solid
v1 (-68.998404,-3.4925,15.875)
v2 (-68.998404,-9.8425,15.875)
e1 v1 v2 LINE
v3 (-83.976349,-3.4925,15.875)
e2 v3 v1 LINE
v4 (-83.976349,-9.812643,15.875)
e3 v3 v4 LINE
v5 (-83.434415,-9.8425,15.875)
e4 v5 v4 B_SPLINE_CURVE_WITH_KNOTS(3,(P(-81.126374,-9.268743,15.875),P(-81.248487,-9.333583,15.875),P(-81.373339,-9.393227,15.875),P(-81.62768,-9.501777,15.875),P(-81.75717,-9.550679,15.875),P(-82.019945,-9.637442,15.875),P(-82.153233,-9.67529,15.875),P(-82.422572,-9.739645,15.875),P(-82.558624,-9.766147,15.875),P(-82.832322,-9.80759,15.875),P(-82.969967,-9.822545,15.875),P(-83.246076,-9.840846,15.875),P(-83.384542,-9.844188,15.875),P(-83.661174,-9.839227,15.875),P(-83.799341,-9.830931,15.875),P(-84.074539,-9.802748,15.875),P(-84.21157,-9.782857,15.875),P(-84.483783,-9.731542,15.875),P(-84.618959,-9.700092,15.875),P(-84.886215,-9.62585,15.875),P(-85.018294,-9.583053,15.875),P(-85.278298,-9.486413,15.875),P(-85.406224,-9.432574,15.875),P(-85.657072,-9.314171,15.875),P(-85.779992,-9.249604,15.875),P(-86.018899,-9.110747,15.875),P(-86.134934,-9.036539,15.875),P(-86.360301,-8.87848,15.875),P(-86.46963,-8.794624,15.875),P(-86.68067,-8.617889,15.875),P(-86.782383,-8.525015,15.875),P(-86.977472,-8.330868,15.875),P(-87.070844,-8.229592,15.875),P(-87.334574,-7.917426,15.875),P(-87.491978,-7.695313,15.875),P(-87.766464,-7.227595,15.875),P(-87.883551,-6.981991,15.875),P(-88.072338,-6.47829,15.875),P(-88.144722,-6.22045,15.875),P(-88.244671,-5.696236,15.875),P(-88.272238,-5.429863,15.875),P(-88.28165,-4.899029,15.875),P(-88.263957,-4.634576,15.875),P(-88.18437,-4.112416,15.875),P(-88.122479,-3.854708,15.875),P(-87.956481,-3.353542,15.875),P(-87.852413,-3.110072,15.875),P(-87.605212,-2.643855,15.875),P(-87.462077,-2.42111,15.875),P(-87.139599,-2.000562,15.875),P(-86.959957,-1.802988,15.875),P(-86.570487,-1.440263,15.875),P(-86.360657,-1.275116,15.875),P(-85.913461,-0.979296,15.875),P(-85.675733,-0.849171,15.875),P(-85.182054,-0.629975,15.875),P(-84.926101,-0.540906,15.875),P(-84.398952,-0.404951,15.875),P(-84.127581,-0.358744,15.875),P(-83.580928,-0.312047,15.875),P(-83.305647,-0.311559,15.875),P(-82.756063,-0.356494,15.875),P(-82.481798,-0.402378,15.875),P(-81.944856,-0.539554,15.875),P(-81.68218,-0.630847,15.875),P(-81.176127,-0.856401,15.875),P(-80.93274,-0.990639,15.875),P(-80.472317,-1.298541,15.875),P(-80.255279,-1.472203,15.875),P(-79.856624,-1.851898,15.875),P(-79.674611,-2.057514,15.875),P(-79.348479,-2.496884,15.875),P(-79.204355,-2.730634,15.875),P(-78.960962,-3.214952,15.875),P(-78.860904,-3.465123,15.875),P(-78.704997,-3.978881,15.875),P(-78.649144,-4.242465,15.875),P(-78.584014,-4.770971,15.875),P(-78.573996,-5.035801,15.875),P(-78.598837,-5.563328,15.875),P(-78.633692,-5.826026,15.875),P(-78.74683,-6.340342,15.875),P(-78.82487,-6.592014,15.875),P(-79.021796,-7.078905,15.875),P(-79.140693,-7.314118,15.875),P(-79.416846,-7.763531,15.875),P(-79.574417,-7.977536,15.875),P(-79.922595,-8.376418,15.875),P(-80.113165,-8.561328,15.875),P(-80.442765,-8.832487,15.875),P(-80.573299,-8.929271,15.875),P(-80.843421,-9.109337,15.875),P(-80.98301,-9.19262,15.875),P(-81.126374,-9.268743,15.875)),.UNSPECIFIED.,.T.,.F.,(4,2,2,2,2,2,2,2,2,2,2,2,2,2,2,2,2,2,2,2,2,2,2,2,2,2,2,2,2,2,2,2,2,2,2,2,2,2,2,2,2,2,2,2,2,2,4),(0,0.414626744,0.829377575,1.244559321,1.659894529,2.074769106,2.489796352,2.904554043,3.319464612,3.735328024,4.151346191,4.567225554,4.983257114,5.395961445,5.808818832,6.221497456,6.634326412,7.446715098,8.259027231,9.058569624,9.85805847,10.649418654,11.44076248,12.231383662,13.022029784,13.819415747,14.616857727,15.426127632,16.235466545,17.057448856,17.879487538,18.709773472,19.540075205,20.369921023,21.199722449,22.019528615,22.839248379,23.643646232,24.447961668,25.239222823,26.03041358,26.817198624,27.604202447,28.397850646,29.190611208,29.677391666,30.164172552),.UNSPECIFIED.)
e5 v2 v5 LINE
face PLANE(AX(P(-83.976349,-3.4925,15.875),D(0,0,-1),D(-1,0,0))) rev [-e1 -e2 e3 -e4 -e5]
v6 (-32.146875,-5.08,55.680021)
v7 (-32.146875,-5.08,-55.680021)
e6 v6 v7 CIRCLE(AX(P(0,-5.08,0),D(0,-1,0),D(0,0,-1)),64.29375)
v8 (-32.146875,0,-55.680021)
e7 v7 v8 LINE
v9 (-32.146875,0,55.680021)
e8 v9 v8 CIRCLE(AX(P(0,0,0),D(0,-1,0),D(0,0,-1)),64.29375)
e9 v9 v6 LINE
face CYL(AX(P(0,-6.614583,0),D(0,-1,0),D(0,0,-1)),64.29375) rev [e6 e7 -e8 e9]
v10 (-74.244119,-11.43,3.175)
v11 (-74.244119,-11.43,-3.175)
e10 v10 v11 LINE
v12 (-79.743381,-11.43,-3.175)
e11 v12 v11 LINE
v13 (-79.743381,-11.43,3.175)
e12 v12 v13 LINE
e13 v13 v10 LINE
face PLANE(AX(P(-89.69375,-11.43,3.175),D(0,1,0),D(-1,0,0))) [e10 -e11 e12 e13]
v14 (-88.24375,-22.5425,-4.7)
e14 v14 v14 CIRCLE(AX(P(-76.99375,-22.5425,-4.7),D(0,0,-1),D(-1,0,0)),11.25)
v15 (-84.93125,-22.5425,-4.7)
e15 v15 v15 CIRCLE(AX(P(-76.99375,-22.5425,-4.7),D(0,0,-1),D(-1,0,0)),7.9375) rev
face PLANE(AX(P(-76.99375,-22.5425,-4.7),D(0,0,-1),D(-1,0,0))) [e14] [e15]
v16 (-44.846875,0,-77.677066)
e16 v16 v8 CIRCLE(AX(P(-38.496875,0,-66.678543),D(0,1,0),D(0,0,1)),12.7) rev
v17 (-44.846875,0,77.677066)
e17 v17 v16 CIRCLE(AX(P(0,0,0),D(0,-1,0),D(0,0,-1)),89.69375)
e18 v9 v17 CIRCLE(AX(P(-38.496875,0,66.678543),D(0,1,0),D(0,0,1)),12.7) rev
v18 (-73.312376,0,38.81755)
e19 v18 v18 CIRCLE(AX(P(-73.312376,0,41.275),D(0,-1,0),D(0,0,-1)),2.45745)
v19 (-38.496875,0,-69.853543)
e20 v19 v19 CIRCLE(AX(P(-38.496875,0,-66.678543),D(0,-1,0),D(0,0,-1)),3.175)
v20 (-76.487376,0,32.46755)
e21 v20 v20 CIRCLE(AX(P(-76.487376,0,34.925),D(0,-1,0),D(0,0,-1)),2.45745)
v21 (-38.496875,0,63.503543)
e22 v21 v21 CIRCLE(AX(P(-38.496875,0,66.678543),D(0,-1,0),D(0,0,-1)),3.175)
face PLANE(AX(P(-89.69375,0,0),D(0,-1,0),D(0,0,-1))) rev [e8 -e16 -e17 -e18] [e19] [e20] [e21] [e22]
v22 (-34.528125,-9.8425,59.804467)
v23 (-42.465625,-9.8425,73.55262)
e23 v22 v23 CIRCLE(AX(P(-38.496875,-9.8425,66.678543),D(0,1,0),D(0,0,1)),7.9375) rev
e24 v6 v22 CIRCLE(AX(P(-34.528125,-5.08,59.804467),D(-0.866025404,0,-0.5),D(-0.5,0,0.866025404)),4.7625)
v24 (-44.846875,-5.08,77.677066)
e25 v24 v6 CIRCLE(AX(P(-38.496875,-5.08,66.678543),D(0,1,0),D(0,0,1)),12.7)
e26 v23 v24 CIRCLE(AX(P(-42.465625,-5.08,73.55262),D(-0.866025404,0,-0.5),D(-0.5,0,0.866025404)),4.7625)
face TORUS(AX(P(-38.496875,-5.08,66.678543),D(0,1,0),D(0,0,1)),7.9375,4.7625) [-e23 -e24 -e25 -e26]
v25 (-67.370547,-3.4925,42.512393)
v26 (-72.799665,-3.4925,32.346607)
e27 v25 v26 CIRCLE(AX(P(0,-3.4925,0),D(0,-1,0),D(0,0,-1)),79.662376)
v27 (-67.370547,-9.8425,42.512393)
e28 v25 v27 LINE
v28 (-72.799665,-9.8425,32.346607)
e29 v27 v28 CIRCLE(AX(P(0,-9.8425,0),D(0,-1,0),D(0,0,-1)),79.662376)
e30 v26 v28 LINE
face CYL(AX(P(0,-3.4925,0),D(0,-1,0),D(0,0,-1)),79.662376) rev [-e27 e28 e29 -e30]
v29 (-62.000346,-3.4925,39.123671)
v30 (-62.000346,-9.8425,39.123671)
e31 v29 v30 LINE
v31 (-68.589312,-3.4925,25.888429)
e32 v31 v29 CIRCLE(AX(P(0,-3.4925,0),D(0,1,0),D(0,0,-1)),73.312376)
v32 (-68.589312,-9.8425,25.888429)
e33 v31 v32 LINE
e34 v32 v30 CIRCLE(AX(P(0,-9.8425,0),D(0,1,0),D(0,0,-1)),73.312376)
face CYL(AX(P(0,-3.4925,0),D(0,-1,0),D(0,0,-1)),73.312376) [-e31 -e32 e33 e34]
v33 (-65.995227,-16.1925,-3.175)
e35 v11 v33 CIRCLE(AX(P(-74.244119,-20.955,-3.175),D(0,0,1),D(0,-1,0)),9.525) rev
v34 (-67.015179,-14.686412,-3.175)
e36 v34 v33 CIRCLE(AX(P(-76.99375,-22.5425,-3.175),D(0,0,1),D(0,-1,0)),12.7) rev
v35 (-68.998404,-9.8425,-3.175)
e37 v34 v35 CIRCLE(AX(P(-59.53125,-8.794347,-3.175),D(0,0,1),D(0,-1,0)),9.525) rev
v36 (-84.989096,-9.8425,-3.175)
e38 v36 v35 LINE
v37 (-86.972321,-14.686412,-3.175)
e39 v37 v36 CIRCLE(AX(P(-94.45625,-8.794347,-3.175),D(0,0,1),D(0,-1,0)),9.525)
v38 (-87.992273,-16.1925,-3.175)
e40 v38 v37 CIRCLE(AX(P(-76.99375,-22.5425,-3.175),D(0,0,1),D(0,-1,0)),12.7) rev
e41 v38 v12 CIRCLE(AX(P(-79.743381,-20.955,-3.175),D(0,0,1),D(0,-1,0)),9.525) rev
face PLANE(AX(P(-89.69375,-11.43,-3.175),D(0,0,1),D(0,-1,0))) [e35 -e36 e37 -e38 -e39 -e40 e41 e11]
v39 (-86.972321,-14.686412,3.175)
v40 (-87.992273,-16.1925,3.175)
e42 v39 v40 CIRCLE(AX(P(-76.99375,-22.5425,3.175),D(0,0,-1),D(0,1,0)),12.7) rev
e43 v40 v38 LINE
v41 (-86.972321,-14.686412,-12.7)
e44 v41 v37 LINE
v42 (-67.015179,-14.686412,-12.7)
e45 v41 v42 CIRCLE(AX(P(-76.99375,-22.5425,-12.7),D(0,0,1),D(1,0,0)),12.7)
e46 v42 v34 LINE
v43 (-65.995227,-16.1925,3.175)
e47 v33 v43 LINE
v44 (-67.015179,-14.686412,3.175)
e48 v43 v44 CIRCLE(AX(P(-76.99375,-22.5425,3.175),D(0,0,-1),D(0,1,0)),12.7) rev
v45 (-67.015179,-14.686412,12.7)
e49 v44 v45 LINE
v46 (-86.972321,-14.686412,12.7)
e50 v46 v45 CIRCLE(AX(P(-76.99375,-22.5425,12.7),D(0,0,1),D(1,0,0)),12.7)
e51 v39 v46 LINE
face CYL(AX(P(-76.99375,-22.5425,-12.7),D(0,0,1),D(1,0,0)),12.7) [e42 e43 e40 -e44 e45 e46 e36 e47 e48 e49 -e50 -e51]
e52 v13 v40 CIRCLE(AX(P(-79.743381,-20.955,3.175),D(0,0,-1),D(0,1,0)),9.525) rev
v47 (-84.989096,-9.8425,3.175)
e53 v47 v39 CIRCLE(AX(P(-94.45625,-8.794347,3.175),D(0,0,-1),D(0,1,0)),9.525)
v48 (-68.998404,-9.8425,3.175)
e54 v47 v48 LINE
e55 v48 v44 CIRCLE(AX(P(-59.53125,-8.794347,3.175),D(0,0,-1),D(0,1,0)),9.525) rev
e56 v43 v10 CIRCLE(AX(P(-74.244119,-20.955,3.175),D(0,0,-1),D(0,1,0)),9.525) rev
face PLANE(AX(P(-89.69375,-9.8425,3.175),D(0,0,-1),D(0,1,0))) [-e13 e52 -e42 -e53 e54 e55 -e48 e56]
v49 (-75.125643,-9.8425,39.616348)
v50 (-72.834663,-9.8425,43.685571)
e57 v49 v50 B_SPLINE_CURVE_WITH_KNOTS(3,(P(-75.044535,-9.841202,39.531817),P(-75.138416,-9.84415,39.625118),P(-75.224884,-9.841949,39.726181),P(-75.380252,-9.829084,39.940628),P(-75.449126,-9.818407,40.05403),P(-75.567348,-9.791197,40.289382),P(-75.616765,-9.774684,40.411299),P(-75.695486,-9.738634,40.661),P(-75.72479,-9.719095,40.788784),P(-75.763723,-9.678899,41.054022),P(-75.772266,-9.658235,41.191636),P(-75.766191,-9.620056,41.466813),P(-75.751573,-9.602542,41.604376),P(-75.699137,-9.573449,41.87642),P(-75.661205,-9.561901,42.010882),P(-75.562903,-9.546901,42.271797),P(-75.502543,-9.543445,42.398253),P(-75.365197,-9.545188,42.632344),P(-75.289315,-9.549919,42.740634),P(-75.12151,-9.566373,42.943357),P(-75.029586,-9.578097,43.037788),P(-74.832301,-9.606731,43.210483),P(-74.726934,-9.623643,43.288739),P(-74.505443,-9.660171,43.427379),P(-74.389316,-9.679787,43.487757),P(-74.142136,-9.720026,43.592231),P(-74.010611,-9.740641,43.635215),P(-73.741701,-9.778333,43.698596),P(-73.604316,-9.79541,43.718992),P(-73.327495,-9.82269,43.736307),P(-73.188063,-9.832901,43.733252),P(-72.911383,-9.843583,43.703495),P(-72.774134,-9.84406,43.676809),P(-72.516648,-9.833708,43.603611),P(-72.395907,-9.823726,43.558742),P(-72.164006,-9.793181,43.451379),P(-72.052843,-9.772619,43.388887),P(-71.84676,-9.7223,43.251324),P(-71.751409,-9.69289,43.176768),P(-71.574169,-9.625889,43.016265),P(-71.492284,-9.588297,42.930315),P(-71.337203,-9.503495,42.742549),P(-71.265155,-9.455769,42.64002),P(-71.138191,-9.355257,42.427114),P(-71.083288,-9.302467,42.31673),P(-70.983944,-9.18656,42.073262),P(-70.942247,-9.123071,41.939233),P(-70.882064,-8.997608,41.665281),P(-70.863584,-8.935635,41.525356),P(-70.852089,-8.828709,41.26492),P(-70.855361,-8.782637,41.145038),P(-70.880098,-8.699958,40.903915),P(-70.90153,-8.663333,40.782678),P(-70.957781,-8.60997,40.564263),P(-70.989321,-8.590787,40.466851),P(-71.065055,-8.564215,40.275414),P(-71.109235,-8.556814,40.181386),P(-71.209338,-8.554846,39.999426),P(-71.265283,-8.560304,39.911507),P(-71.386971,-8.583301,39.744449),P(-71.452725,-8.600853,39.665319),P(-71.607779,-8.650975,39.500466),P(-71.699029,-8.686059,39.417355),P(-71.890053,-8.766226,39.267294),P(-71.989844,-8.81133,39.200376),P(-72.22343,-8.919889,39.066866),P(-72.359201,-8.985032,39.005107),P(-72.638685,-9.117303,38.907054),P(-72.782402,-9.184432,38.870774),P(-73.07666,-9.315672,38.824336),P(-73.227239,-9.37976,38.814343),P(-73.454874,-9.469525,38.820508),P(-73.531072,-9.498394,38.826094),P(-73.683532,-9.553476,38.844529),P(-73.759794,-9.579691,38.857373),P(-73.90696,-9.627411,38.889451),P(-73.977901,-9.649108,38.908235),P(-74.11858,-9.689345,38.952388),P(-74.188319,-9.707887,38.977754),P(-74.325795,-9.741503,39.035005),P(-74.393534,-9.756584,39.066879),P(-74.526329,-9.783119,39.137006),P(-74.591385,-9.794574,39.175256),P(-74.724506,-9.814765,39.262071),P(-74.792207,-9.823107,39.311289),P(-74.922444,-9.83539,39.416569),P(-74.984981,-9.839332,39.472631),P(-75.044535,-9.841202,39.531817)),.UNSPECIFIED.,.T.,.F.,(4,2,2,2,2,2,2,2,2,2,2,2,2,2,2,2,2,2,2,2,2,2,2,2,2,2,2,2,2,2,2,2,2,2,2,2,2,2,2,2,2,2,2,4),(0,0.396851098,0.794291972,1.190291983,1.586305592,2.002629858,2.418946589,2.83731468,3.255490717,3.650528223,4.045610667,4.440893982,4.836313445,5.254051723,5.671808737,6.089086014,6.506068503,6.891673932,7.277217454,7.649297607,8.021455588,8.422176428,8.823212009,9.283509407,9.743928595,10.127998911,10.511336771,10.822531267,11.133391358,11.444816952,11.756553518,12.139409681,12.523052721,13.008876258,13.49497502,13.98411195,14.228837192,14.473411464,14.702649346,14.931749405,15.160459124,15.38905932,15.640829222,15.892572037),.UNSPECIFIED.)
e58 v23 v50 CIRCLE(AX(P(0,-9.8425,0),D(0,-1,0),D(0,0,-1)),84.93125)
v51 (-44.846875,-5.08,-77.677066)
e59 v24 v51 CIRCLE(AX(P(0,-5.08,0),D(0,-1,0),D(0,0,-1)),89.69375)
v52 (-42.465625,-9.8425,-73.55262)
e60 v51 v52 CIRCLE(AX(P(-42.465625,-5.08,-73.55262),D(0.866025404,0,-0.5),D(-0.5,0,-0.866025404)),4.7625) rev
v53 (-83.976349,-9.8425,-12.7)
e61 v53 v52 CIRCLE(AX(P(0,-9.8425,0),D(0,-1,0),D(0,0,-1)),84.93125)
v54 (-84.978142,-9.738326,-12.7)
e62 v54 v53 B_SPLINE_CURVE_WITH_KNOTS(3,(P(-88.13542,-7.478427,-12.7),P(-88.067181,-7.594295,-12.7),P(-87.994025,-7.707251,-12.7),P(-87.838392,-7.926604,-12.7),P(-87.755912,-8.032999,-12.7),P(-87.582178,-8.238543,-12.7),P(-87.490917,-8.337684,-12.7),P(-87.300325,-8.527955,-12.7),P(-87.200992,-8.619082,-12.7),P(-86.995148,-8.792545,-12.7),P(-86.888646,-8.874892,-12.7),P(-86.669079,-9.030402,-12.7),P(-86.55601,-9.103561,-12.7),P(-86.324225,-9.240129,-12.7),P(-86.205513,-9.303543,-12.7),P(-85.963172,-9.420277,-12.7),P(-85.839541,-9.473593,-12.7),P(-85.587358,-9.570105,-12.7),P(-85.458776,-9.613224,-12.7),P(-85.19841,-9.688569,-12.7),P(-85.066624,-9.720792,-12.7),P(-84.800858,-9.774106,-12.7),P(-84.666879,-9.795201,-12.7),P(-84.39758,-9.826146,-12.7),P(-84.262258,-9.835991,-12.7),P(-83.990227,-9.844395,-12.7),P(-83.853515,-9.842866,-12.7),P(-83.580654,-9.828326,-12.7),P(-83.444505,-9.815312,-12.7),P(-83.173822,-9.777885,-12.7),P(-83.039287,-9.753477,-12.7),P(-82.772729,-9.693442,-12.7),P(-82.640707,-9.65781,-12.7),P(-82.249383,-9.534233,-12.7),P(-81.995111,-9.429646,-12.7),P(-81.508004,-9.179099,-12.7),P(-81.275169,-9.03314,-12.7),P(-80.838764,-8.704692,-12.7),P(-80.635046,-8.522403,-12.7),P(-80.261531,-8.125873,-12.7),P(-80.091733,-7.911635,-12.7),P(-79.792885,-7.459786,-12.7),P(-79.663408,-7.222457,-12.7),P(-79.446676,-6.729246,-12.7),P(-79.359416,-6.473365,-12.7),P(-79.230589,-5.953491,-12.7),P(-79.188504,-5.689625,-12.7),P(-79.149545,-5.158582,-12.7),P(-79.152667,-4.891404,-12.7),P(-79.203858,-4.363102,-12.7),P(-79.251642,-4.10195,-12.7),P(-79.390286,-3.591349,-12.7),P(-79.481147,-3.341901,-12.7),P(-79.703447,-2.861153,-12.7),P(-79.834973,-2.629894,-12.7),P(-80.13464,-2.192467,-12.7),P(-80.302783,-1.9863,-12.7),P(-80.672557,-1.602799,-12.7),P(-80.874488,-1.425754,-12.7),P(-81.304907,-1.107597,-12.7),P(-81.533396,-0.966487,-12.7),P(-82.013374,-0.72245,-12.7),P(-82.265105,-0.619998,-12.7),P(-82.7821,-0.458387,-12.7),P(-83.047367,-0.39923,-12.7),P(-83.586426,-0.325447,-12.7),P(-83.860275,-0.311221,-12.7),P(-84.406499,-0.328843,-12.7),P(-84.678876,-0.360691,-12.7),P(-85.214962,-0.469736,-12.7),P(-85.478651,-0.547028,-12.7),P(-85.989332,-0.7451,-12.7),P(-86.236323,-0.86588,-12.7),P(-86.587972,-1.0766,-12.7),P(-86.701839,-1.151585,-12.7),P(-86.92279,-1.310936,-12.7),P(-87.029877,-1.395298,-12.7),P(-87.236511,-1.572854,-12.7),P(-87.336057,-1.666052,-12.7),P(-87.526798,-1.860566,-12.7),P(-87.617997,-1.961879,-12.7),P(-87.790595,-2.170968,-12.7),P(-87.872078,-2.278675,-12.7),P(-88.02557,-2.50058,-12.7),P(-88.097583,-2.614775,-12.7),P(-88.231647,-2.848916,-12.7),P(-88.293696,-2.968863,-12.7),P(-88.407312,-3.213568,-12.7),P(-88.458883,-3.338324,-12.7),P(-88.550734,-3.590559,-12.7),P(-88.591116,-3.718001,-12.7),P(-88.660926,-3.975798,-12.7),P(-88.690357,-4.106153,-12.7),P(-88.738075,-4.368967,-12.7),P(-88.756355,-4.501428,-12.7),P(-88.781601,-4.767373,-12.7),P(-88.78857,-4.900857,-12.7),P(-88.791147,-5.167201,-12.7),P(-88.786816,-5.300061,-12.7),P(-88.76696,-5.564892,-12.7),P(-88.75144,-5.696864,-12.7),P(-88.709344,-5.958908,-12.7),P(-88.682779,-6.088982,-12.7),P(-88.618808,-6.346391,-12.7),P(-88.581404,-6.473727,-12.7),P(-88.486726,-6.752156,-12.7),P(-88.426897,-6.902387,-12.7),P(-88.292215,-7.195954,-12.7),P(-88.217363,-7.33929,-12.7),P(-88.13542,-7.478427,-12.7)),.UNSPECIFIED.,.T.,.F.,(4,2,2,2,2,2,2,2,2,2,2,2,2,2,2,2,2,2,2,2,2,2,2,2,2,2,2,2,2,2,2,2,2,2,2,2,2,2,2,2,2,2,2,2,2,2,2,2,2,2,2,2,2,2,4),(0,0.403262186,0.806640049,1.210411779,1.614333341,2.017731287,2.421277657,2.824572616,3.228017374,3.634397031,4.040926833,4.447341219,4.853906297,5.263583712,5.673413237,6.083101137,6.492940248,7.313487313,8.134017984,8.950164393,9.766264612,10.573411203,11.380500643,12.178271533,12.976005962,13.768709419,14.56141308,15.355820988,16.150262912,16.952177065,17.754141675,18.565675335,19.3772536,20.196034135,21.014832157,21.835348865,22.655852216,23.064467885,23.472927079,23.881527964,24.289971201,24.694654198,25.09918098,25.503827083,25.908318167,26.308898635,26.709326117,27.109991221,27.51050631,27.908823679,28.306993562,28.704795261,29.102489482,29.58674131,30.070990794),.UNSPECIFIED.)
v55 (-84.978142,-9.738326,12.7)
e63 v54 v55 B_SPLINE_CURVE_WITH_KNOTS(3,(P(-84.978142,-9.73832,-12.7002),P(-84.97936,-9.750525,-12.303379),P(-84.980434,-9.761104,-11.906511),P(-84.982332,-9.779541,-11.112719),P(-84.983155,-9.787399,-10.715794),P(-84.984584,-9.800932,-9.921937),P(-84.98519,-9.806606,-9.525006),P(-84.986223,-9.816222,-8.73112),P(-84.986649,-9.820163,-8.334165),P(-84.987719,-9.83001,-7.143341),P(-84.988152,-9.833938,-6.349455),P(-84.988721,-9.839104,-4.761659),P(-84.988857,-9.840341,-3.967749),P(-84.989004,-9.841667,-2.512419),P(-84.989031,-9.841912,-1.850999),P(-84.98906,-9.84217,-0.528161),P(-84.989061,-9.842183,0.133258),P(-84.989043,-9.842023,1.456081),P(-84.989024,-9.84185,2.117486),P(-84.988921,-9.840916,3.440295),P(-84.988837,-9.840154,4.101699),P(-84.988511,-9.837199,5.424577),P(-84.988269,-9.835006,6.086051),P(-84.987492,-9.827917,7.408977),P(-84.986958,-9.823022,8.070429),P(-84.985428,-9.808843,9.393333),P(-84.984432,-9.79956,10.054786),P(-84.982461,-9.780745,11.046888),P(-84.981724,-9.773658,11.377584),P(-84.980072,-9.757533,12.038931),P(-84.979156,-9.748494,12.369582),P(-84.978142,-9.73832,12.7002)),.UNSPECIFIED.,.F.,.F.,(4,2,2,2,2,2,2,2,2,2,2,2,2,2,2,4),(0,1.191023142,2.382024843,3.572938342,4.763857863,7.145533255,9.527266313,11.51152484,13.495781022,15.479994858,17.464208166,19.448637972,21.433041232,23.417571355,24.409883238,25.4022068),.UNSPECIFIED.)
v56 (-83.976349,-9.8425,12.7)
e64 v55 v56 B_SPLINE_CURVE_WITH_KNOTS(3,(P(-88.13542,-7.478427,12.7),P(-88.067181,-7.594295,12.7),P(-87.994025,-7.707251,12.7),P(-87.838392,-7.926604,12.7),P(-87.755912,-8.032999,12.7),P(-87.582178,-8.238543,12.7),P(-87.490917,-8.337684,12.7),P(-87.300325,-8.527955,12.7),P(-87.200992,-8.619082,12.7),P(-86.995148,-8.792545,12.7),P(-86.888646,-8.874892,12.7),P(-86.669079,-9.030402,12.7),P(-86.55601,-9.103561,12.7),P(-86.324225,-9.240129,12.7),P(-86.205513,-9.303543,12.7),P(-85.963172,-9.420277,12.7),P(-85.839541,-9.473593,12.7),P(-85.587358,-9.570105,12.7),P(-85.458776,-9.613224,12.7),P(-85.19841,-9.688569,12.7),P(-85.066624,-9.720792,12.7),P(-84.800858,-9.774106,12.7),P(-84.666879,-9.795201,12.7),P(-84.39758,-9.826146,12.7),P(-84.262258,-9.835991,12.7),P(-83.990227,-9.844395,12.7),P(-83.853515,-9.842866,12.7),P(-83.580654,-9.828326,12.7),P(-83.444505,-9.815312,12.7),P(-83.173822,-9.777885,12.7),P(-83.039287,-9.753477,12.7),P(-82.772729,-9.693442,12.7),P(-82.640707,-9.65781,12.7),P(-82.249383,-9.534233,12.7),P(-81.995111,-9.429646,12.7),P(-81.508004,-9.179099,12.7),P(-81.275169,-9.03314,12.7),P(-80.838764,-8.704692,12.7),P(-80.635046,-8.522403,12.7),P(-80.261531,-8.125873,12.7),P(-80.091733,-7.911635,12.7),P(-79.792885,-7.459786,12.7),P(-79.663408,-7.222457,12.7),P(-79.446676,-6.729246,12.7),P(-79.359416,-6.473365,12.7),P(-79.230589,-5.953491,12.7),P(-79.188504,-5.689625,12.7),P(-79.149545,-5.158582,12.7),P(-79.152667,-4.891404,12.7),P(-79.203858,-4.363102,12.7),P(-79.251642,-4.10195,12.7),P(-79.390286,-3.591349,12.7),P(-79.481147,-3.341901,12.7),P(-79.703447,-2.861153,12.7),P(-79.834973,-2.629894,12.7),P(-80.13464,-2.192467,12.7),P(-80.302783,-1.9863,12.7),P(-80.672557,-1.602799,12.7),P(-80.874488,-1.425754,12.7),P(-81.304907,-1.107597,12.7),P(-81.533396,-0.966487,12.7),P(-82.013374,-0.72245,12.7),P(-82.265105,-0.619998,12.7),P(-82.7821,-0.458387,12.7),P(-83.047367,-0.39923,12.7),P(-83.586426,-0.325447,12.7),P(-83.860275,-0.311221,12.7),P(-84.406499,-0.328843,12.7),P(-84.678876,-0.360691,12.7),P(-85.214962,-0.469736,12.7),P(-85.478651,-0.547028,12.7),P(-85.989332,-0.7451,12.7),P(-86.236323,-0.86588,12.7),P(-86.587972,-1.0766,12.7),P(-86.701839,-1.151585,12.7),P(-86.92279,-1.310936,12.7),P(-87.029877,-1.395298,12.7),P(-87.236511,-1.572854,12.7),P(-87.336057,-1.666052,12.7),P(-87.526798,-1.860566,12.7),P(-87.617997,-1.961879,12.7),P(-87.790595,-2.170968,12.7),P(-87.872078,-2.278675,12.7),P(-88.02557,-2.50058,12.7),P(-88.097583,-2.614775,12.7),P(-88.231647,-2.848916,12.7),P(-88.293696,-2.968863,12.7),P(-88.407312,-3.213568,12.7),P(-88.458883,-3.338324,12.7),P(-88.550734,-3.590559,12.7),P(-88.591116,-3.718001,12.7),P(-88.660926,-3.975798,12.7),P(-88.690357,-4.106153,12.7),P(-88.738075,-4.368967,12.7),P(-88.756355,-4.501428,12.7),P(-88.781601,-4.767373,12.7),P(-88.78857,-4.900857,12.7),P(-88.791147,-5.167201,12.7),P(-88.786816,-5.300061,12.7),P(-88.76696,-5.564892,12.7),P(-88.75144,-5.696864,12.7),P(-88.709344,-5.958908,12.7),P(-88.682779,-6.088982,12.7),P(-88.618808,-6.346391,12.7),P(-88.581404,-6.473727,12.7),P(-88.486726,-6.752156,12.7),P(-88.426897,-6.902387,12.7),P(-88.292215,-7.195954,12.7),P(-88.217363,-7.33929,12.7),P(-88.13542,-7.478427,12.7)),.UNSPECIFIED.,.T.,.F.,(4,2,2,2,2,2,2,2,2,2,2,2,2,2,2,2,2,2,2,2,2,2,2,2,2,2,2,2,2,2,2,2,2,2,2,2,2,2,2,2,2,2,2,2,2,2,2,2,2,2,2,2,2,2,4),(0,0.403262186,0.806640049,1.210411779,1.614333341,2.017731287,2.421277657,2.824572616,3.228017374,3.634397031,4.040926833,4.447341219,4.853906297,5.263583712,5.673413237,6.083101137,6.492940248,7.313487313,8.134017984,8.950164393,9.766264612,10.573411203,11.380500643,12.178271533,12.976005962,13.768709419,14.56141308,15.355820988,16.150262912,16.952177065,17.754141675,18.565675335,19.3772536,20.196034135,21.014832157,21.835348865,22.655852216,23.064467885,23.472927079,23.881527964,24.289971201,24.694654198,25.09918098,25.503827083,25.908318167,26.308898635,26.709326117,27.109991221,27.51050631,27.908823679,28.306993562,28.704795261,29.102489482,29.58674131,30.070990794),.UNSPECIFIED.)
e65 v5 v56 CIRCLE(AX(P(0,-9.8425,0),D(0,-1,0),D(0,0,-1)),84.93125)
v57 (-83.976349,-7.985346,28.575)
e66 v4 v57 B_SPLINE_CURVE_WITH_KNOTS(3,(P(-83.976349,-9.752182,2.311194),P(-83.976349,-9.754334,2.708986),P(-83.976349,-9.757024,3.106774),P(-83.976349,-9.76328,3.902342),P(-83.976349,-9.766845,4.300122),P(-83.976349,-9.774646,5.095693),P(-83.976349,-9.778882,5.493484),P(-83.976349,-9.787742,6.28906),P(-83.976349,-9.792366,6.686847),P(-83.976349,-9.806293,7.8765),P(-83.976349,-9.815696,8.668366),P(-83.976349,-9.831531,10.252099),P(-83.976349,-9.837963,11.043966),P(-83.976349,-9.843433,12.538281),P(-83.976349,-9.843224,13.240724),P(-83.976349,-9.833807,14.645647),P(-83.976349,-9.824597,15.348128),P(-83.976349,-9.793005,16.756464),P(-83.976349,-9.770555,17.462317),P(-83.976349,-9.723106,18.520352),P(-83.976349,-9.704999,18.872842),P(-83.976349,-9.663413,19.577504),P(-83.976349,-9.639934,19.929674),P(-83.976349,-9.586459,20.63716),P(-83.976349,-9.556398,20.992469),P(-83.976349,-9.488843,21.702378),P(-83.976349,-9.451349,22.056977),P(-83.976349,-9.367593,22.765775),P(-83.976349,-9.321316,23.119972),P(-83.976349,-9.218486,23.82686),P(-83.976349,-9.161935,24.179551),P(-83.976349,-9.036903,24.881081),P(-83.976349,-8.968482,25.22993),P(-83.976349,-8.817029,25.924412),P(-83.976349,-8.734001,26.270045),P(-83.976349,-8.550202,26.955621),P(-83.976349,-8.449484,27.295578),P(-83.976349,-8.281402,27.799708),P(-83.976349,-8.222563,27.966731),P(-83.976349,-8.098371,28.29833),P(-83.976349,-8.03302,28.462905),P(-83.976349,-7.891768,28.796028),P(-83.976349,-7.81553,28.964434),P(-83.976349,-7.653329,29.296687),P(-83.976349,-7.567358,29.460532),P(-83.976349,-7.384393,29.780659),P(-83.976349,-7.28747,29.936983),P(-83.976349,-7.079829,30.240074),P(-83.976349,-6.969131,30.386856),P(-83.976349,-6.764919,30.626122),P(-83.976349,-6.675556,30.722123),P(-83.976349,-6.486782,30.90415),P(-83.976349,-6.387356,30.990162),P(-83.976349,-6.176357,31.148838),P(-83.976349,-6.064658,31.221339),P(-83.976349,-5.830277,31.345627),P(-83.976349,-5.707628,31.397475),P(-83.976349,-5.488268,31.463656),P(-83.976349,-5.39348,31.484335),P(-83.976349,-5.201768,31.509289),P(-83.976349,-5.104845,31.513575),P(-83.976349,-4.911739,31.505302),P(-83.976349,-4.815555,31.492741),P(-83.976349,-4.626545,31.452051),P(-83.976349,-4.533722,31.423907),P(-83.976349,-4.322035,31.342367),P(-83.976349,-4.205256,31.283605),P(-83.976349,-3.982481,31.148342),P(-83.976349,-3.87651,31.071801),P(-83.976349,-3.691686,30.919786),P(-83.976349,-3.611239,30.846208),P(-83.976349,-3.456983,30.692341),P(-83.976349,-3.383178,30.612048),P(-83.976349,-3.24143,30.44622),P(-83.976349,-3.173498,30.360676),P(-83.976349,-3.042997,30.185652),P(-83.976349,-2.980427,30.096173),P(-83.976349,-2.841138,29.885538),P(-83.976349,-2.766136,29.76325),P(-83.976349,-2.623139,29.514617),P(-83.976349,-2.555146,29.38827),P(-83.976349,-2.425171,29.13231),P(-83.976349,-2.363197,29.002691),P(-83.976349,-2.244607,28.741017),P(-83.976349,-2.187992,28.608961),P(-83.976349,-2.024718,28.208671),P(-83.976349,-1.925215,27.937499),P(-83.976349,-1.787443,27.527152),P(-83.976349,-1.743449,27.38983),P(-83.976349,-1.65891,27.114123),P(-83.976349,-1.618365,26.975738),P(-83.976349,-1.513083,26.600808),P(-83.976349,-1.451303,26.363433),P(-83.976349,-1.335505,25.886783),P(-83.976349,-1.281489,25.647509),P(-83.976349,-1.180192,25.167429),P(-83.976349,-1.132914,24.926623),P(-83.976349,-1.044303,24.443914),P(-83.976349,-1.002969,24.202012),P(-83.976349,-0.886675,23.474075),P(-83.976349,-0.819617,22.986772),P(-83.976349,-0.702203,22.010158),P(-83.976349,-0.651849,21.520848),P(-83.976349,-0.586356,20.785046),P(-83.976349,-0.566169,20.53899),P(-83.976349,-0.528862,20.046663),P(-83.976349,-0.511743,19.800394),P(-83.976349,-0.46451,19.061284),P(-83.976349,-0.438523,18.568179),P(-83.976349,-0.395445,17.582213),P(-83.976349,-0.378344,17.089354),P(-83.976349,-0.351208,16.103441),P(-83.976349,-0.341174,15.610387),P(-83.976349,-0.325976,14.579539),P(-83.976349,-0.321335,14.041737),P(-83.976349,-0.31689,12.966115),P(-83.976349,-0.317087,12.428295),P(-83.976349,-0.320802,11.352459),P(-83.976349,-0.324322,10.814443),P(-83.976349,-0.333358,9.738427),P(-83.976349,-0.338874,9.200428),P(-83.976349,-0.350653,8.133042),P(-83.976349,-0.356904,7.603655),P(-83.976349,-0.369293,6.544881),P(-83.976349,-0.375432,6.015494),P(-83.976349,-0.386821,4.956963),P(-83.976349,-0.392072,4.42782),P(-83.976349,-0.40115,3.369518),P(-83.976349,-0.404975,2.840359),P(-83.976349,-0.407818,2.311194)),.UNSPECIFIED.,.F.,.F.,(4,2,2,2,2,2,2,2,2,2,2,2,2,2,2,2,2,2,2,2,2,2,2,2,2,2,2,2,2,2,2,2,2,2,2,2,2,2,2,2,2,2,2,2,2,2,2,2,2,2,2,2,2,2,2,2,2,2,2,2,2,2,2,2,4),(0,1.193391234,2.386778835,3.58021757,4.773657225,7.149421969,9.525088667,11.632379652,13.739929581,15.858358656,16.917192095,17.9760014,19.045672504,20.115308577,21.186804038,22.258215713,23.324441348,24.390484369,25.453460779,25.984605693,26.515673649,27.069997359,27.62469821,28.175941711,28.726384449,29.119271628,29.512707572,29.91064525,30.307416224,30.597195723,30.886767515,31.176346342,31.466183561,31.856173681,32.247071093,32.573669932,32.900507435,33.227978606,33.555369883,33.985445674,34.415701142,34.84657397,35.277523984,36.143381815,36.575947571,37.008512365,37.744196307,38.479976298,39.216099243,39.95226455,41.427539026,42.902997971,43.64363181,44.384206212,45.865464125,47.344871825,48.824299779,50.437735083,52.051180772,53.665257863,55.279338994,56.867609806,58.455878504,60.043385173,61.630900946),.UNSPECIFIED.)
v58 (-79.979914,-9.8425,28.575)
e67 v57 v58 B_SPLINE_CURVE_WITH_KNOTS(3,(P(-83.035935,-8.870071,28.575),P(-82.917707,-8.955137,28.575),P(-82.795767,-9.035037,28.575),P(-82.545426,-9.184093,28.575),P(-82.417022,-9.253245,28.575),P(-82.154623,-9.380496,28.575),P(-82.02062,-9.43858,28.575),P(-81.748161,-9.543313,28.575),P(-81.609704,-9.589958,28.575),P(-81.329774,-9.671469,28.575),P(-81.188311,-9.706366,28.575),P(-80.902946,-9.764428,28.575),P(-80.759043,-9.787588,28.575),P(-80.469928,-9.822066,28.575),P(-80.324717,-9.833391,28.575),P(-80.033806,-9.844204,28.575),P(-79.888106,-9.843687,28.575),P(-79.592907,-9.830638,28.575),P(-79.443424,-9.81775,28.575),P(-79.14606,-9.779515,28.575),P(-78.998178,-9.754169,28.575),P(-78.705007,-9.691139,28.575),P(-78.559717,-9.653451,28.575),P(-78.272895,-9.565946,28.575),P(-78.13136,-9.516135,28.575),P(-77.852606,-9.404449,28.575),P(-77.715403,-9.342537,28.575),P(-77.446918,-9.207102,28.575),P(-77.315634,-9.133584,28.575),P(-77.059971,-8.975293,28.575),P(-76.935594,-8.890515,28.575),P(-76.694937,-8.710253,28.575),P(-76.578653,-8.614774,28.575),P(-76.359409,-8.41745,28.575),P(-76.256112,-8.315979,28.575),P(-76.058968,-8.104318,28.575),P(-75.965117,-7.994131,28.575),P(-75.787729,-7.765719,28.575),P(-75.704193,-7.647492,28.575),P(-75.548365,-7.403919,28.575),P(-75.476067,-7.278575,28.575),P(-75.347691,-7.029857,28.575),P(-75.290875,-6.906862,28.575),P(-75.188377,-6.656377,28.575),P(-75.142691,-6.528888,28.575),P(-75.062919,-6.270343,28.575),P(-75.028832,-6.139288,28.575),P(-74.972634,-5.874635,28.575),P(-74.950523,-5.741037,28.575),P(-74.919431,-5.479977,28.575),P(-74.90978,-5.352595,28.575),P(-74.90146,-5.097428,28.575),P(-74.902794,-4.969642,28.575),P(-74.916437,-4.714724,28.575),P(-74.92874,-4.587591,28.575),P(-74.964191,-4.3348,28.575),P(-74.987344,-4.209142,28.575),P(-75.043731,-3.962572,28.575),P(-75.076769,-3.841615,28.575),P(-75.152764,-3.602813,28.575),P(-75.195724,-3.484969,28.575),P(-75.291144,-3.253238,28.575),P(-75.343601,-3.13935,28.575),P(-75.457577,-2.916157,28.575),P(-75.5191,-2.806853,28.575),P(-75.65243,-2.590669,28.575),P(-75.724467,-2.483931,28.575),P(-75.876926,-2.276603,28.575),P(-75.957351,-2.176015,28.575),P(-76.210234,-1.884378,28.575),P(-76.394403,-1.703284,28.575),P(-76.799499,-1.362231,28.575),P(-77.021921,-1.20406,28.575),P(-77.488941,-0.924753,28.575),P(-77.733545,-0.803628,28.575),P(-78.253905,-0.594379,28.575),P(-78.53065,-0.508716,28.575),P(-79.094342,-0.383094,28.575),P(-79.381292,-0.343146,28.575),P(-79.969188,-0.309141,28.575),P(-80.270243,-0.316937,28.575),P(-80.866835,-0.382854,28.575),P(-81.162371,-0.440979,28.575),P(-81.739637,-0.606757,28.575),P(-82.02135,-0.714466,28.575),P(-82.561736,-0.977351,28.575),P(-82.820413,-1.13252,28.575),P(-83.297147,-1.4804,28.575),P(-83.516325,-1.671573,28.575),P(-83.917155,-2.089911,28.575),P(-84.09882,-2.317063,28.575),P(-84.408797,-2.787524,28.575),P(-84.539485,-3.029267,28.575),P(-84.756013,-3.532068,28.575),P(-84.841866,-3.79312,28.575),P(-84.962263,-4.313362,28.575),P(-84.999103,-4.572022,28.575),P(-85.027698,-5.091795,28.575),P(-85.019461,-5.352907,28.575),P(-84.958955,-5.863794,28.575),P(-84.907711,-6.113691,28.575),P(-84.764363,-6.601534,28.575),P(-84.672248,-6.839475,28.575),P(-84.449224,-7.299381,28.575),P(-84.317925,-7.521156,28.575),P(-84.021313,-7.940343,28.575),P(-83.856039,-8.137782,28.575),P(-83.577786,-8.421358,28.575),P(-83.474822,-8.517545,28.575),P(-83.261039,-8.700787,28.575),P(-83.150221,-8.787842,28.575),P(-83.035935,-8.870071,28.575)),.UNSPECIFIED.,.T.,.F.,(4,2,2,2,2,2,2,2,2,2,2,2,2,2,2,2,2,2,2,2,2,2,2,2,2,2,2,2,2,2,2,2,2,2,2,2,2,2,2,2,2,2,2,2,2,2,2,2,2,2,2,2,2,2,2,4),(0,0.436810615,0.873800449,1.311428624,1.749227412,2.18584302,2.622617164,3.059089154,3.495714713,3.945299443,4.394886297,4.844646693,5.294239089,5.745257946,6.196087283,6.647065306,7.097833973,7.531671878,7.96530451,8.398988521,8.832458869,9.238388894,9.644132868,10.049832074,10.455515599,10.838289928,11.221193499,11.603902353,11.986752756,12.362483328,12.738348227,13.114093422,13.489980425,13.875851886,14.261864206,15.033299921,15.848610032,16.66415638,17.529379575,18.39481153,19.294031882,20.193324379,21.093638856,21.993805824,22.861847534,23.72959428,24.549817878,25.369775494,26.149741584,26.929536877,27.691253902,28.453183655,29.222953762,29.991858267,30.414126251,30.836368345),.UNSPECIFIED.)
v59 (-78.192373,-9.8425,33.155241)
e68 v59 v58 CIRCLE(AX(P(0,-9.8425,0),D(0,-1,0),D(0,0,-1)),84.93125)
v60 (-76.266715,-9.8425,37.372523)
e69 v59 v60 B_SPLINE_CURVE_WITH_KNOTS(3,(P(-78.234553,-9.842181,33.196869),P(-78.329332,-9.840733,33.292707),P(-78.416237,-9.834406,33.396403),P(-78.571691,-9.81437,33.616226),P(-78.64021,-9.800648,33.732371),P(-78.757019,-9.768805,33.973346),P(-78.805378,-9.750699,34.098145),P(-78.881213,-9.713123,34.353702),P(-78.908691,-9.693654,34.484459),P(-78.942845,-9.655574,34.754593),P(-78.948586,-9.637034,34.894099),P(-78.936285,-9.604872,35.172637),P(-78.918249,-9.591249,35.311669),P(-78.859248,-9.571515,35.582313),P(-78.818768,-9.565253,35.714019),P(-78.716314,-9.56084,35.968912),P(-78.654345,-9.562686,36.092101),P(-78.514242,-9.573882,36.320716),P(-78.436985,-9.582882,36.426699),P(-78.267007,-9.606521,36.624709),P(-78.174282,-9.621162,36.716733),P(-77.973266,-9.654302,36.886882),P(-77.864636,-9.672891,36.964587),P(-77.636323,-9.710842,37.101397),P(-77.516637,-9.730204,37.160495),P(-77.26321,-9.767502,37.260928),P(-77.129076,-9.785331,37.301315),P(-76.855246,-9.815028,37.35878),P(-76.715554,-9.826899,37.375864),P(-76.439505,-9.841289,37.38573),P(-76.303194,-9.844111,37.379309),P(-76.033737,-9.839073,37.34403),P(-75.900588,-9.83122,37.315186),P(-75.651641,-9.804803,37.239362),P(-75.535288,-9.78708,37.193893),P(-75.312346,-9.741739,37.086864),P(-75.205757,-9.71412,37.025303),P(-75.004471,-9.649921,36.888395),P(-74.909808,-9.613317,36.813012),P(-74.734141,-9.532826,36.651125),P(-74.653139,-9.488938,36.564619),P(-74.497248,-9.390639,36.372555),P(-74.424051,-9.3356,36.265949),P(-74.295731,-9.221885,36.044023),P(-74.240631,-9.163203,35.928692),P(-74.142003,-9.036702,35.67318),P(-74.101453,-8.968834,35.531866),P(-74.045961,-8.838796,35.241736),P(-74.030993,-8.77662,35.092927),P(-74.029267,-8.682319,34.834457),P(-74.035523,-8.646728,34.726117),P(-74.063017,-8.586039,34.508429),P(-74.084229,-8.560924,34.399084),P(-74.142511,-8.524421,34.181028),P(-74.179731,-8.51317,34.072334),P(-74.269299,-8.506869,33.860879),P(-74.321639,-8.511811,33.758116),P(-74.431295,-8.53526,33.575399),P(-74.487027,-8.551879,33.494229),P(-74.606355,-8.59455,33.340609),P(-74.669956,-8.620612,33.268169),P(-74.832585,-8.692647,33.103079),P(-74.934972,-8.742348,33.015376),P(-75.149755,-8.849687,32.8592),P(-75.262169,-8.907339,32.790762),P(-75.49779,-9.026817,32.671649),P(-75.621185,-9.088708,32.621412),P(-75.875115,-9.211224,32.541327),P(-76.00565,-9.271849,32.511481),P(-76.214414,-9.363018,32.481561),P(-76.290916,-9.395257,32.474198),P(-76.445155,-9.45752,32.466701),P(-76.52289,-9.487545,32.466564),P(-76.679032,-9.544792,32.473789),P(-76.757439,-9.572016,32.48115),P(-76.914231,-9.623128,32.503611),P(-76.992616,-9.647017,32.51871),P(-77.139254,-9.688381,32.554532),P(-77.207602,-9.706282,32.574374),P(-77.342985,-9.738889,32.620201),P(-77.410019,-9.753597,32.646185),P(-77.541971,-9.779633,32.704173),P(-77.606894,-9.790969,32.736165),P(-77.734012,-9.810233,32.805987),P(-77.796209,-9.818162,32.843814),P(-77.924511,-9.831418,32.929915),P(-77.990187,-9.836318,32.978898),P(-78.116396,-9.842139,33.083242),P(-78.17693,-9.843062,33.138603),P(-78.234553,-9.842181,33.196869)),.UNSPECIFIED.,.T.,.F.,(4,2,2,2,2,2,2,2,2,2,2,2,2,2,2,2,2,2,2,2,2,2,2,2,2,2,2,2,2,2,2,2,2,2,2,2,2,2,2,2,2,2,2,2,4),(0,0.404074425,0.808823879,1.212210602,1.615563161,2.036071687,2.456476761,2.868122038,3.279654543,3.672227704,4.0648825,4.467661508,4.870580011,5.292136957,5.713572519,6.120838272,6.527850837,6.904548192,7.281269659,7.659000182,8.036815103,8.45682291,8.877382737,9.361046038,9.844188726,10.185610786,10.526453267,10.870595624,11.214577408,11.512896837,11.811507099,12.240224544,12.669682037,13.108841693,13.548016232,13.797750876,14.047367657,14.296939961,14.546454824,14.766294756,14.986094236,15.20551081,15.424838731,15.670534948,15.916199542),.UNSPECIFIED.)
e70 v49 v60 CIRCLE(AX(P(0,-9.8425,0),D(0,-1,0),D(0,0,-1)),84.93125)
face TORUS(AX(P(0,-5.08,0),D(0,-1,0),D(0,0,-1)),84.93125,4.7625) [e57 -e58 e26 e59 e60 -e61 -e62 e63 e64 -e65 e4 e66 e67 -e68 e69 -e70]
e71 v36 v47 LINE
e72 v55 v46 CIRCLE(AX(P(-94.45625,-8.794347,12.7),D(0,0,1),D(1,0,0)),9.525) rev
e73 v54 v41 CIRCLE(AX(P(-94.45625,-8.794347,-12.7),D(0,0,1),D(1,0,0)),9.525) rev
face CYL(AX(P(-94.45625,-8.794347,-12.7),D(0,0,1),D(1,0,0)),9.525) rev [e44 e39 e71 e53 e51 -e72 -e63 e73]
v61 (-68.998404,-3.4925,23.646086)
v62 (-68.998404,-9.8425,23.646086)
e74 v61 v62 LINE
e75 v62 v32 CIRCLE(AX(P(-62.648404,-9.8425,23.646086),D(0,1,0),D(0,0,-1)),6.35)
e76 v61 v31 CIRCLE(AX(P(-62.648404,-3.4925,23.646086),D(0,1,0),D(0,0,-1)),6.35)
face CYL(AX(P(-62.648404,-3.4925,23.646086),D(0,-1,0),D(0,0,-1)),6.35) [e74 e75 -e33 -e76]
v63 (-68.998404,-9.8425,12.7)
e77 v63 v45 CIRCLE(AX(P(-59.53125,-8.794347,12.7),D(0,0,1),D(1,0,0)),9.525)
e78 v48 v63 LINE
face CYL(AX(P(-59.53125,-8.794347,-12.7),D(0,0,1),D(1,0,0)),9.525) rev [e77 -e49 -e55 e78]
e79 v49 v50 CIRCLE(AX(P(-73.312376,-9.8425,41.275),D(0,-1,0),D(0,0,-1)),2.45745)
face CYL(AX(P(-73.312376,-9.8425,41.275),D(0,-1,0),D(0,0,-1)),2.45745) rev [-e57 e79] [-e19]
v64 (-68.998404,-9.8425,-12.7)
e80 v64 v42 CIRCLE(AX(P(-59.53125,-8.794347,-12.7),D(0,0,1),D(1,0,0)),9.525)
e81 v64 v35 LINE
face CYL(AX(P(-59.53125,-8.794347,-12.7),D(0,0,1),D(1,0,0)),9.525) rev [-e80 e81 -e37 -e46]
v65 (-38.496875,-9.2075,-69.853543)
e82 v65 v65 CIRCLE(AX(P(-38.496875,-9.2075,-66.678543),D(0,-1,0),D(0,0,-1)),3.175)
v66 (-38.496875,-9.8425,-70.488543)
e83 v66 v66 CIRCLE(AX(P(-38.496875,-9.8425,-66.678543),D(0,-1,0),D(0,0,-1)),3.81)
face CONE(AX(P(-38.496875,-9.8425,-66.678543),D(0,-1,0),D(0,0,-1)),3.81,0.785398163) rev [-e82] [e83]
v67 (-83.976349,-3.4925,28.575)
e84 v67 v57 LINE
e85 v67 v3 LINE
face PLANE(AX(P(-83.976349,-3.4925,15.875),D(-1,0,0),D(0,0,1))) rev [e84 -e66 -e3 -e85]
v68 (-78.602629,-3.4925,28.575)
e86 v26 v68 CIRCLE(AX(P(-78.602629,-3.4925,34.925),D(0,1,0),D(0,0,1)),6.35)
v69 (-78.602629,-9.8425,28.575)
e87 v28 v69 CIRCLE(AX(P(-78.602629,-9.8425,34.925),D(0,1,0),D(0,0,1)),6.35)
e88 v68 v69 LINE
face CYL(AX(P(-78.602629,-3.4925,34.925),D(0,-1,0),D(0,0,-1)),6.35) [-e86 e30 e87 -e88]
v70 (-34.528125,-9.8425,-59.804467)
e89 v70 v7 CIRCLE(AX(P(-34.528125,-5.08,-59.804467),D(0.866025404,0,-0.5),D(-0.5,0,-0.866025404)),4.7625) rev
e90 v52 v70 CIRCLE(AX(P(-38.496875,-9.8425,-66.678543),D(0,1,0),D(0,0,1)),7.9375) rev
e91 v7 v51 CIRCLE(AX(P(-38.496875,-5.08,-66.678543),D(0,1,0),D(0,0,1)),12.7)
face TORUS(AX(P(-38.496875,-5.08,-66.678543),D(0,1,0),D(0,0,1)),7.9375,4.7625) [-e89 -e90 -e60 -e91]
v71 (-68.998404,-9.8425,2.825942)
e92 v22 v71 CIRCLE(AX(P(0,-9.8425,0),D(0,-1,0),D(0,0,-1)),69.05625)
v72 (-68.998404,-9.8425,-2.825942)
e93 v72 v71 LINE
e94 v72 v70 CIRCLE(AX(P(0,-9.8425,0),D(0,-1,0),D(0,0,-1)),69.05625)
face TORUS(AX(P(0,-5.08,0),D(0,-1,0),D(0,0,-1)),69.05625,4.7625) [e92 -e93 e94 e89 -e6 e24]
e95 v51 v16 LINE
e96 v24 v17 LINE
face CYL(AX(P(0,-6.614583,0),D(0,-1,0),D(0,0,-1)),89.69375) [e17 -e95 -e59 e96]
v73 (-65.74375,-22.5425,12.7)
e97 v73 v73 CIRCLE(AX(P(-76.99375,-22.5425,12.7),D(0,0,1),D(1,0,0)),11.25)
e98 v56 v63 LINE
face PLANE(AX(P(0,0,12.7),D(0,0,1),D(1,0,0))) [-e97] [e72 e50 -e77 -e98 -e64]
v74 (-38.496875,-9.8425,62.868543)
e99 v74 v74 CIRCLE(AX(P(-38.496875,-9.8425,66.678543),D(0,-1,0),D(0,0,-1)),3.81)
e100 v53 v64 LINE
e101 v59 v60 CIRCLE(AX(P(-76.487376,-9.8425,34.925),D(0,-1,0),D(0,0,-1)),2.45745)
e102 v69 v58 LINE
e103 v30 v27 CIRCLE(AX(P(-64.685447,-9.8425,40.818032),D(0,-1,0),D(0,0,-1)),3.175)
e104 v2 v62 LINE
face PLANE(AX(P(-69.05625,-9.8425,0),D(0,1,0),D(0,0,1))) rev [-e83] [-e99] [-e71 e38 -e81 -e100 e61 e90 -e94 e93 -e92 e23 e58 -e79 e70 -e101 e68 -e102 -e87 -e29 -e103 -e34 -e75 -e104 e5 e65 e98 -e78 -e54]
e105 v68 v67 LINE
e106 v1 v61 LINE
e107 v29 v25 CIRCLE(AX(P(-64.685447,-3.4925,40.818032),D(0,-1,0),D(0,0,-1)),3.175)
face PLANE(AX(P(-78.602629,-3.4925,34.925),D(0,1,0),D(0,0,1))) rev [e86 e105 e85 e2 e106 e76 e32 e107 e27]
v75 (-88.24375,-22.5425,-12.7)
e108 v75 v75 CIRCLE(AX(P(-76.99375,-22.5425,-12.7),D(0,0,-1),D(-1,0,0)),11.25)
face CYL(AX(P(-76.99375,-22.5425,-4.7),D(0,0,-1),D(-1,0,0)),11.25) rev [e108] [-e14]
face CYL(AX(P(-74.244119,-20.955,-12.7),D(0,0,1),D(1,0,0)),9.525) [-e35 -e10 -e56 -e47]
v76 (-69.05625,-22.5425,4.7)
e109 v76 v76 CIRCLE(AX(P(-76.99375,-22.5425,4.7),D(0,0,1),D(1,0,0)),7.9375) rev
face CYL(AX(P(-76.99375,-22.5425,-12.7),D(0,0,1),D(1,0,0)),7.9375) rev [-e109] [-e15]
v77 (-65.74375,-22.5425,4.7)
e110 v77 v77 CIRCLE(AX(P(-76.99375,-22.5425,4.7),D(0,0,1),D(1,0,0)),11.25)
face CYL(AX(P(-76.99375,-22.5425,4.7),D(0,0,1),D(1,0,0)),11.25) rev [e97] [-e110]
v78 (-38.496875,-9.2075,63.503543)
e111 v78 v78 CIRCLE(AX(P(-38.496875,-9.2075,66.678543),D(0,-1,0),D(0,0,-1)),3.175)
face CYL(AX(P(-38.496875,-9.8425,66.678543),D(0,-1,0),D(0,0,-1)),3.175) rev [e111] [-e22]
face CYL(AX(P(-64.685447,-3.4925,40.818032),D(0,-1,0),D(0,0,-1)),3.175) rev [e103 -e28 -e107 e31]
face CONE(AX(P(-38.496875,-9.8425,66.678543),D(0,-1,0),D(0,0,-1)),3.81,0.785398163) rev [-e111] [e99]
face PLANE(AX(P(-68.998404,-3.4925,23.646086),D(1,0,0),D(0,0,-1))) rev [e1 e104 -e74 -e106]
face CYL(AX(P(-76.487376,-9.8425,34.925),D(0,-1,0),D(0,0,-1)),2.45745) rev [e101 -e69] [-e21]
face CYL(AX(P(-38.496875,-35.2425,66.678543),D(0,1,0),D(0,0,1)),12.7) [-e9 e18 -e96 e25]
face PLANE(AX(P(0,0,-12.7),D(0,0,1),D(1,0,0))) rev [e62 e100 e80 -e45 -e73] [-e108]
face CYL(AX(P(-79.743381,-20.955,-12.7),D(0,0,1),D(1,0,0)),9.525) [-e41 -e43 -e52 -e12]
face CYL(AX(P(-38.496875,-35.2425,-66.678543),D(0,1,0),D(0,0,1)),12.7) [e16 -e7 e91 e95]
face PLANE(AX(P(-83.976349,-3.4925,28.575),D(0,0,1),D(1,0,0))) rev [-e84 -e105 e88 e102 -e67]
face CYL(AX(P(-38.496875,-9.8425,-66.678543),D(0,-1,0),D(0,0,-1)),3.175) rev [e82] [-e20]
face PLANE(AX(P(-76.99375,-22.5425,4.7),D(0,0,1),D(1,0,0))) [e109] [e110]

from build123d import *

# Parameters (mm, degrees)
SENSORARMATURE_DEPTH                  = 12.7
SENSORARMATURE_DEPTH_BACK             = 12.7
SKETCH2_R                             = 7.9375
SKETCH2_R_2                           = 4
SKETCH2_R_3                           = 2.38125
SKETCH15_R                            = 11.25
BEARINGRACE1_DEPTH                    = 8
SKETCH16_R                            = 11.25
BEARINGRACE2_DEPTH                    = 8
CUT_EXTRUDE3_DEPTH                    = 188.895496905
FILLET1_R                             = 9.525
MAINSENSORINSET_DEPTH                 = 6.35
F_10_0_1935_DIAMETER_HOLE1_D          = 4.9149
F_1_4_0_25_DIAMETER_HOLE1_D           = 6.35
F_1_4_0_25_DIAMETER_HOLE1_CSINK_D     = 7.62
F_1_4_0_25_DIAMETER_HOLE1_CSINK_ANGLE = 90
CUT_EXTRUDE6_DEPTH                    = 132.65094541
CUT_EXTRUDE6_DEPTH_BACK               = 132.65094541
FILLET2_ANGLE                         = 180
FILLET2_2_ANGLE                       = 180


with BuildPart() as part:
    # Sketch1 → MainAttachmentRing (revolve)
    with BuildSketch(Plane.XY, mode=Mode.PRIVATE) as mainattachmentring_sk:
        with BuildLine():
            Line((-64.29375, 0), (-64.29375, -5.08))
            ThreePointArc((-64.29375, -5.08), (-65.688653955, -8.447596045), (-69.05625, -9.8425))
            Line((-69.05625, -9.8425), (-84.93125, -9.8425))
            ThreePointArc((-84.93125, -9.8425), (-88.298846045, -8.447596045), (-89.69375, -5.08))
            Line((-89.69375, -5.08), (-89.69375, 0))
            Line((-89.69375, 0), (-64.29375, 0))
        make_face()
    revolve(mainattachmentring_sk.sketch.rotate(Axis((0, -6.614583333, 0), (0, 1, 0)), 270), axis=Axis((0, -6.614583333, 0), (0, 1, 0)))

    # Sketch2 → SensorArmature (add, two sides: drawn at the far end of the back side and taken through both)
    # profile 1 of 2: a face of its own
    with BuildSketch(Plane.XY.offset(-SENSORARMATURE_DEPTH_BACK)):
        with BuildLine():
            Line((-69.05625, -8.794346715), (-69.05625, -3.4925))
            Line((-69.05625, -3.4925), (-84.93125, -3.4925))
            Line((-84.93125, -3.4925), (-84.93125, -8.794346715))
            ThreePointArc((-84.93125, -8.794346715), (-85.455970986, -11.912134822), (-86.972321429, -14.686412409))
            ThreePointArc((-86.972321429, -14.686412409), (-76.99375, -35.2425), (-67.015178571, -14.686412409))
            ThreePointArc((-67.015178571, -14.686412409), (-68.531529014, -11.912134822), (-69.05625, -8.794346715))
        make_face()
        with Locations((-76.99375, -22.5425)):
            Circle(SKETCH2_R, mode=Mode.SUBTRACT)
    # profile 2 of 2: a face of its own
    with BuildSketch(Plane.XY.offset(-SENSORARMATURE_DEPTH_BACK)):
        with Locations((-76.99375, -22.5425)):
            Circle(SKETCH2_R_2)
        with Locations((-76.99375, -22.5425)):
            Circle(SKETCH2_R_3, mode=Mode.SUBTRACT)
    extrude(amount=SENSORARMATURE_DEPTH + SENSORARMATURE_DEPTH_BACK)


with BuildPart() as sensorarmature_kept_piece:
    # of the separate pieces the step leaves, the one the design keeps (sensorarmature_pieces_kept)
    add(part.part.solids().sort_by_distance((0, 0, -64.29375))[0])

    # Sketch15 → BearingRace1 (cut)
    with BuildSketch(Plane.XY.offset(12.7)):
        with Locations((-76.99375, -22.5425)):
            Circle(SKETCH15_R)
    extrude(amount=-BEARINGRACE1_DEPTH, mode=Mode.SUBTRACT)

    # Sketch16 → BearingRace2 (cut)
    with BuildSketch(Plane(origin=(0, 0, -12.7), x_dir=(-1, 0, 0), z_dir=(0, 0, -1))):
        with Locations(Location((76.99375, -22.5425, 0), (0, 0, 180))):
            Circle(SKETCH16_R)
    extrude(amount=-BEARINGRACE2_DEPTH, mode=Mode.SUBTRACT)

    # Sketch17 → Cut-Extrude3 (cut, through all)
    with BuildSketch(Plane(origin=(65.0875, 22.225, 0), x_dir=(0, 0, 1), z_dir=(-1, 0, 0))):
        with BuildLine():
            Line((2.825941823, -32.0675), (3.175, -32.0675))
            Line((3.175, -32.0675), (3.175, -33.655))
            Line((3.175, -33.655), (-3.175, -33.655))
            Line((-3.175, -33.655), (-3.175, -32.0675))
            Line((-3.175, -32.0675), (-2.825941823, -32.0675))
            add(Edge.make_bspline(
                [(-2.825941823, -32.0675), (-0.941980608, -32.0675), (0.941980608, -32.0675), (2.825941823, -32.0675)],
                knots=[0, 0, 0, 0, 1, 1, 1, 1], degree=3))
        make_face()
    extrude(amount=CUT_EXTRUDE3_DEPTH, mode=Mode.SUBTRACT)

    # Fillet1
    # the kernel refuses this fillet: 9.525 mm, written as the material it takes off along each edge
    with BuildSketch(Plane(origin=(-68.684334549, -11.43, 3.175), x_dir=(-1, 0, 0), z_dir=(0, 0, -1))) as fillet1_piece_1:
        with BuildLine():
            CenterArc((5.559784794, -9.525), FILLET1_R, 90, 60)
            Line((-2.689107177, -4.7625), (-3.513996374, -4.28625))
            ThreePointArc((-3.513996374, -4.28625), (-2.417548835, -2.667205839), (-0.915308455, 0.263565329))
            Line((-0.915308455, 0.263565329), (0, 0.9525))
            Line((0, 0.9525), (5.559784794, 0.9525))
            Line((5.559784794, 0.9525), (5.559784794, 0))
        make_face()
    extrude(amount=6.35, mode=Mode.SUBTRACT)
    with BuildSketch(Plane(origin=(-85.303165451, -11.43, 3.175), x_dir=(1, 0, 0), z_dir=(0, 0, -1))) as fillet1_piece_2:
        with BuildLine():
            CenterArc((5.559784794, 9.525), FILLET1_R, 210, 60)
            Line((-2.689107177, 4.7625), (-3.513996374, 4.28625))
            ThreePointArc((-3.513996374, 4.28625), (-2.417548835, 2.667205839), (-0.915308455, -0.263565329))
            Line((-0.915308455, -0.263565329), (0, -0.9525))
            Line((0, -0.9525), (5.559784794, -0.9525))
            Line((5.559784794, -0.9525), (5.559784794, 0))
        make_face()
    extrude(amount=6.35, mode=Mode.SUBTRACT)

    # Sketch19 → MainSensorInset (cut)
    with BuildSketch(Plane.XZ.offset(9.8425)):
        with BuildLine():
            Line((-83.97634921, 15.875), (-68.998403727, 15.875))
            Line((-68.998403727, 15.875), (-68.998403727, 23.64608578))
            ThreePointArc((-68.998403727, 23.64608578), (-68.895293758, 24.785763339), (-68.589312408, 25.888429207))
            ThreePointArc((-68.589312408, 25.888429207), (-65.62931995, 32.672571163), (-62.000346171, 39.123670816))
            ThreePointArc((-62.000346171, 39.123670816), (-62.991085358, 43.50313264), (-67.370547181, 42.512393453))
            ThreePointArc((-67.370547181, 42.512393453), (-70.269181894, 37.52780703), (-72.79966532, 32.346606528))
            ThreePointArc((-72.79966532, 32.346606528), (-75.142159242, 29.600748947), (-78.602628968, 28.575))
            Line((-78.602628968, 28.575), (-83.97634921, 28.575))
            Line((-83.97634921, 28.575), (-83.97634921, 15.875))
        make_face()
    extrude(amount=-MAINSENSORINSET_DEPTH, mode=Mode.SUBTRACT)

    # #10 (0.1935) Diameter Hole1 (through all)
    with Locations(Plane(origin=(0, -9.8425, 0), x_dir=(-1, 0, 0), z_dir=(0, -1, 0))):
        with Locations((73.312376468, -41.275), (76.487376468, -34.925)):
            Hole(F_10_0_1935_DIAMETER_HOLE1_D / 2)

    # 1/4 (0.25) Diameter Hole1 (through all)
    with Locations(Plane(origin=(0, -9.8425, 0), x_dir=(-1, 0, 0), z_dir=(0, -1, 0))):
        with Locations((-76.99375, 0), (38.496875, 66.678543433), (38.496875, -66.678543433), (0, 0)):
            CounterSinkHole(F_1_4_0_25_DIAMETER_HOLE1_D / 2, F_1_4_0_25_DIAMETER_HOLE1_CSINK_D / 2, counter_sink_angle=F_1_4_0_25_DIAMETER_HOLE1_CSINK_ANGLE)

    # Sketch28 → Cut-Extrude6 (cut, two sides: drawn at the far end of the back side and taken through both)
    with BuildSketch(Plane(origin=(0, 0, 0), x_dir=(1, 0, 0), z_dir=(0, 1, 0)).offset(-CUT_EXTRUDE6_DEPTH_BACK)):
        with BuildLine():
            Line((0, 0), (-32.146875, 55.680020805))
            ThreePointArc((-32.146875, 55.680020805), (-27.498352372, 73.028543433), (-44.846875, 77.677066061))
            Line((-44.846875, 77.677066061), (-52.641298624, 91.177403793))
            Line((-52.641298624, 91.177403793), (62.971207783, 117.188002958))
            Line((62.971207783, 117.188002958), (148.903396654, 11.630273141))
            Line((148.903396654, 11.630273141), (-6.989072656, -155.463930645))
            Line((-6.989072656, -155.463930645), (-55.413884825, -95.979663962))
            Line((-55.413884825, -95.979663962), (-44.846875, -77.677066061))
            ThreePointArc((-44.846875, -77.677066061), (-27.498352372, -73.028543433), (-32.146875, -55.680020805))
            Line((-32.146875, -55.680020805), (0, 0))
        make_face()
    extrude(amount=CUT_EXTRUDE6_DEPTH + CUT_EXTRUDE6_DEPTH_BACK, mode=Mode.SUBTRACT)

    # Fillet2: read off the stored shape, not the designer's step
    # Fillet2 outline → Fillet2 (revolve, cut)
    with BuildSketch(Plane(origin=(-38.496875, 0, 66.678543433), x_dir=(-0.4999999999999933, 0, 0.8660254037844425), z_dir=(-0.8660254037844425, 0, -0.4999999999999933))):
        with BuildLine():
            ThreePointArc((12.7, -5.08), (11.305096045, -8.447596045), (7.9375, -9.8425))
            Line((7.9375, -9.8425), (12.7, -9.8425))
            Line((12.7, -9.8425), (12.7, -5.08))
        make_face()
    revolve(axis=Axis((-38.496875, 0, 66.678543433), (0, 1, 0)), revolution_arc=FILLET2_ANGLE, mode=Mode.SUBTRACT)

    # Fillet2 2 outline → Fillet2 2 (revolve, cut)
    with BuildSketch(Plane(origin=(-38.496875, 0, -66.678543433), x_dir=(0.4999999999999988, 0, 0.8660254037844394), z_dir=(-0.8660254037844394, 0, 0.4999999999999988))):
        with BuildLine():
            ThreePointArc((12.7, -5.08), (11.305096045, -8.447596045), (7.9375, -9.8425))
            Line((7.9375, -9.8425), (12.7, -9.8425))
            Line((12.7, -9.8425), (12.7, -5.08))
        make_face()
    revolve(axis=Axis((-38.496875, 0, -66.678543433), (0, 1, 0)), revolution_arc=FILLET2_2_ANGLE, mode=Mode.SUBTRACT)


solid = sensorarmature_kept_piece.part
